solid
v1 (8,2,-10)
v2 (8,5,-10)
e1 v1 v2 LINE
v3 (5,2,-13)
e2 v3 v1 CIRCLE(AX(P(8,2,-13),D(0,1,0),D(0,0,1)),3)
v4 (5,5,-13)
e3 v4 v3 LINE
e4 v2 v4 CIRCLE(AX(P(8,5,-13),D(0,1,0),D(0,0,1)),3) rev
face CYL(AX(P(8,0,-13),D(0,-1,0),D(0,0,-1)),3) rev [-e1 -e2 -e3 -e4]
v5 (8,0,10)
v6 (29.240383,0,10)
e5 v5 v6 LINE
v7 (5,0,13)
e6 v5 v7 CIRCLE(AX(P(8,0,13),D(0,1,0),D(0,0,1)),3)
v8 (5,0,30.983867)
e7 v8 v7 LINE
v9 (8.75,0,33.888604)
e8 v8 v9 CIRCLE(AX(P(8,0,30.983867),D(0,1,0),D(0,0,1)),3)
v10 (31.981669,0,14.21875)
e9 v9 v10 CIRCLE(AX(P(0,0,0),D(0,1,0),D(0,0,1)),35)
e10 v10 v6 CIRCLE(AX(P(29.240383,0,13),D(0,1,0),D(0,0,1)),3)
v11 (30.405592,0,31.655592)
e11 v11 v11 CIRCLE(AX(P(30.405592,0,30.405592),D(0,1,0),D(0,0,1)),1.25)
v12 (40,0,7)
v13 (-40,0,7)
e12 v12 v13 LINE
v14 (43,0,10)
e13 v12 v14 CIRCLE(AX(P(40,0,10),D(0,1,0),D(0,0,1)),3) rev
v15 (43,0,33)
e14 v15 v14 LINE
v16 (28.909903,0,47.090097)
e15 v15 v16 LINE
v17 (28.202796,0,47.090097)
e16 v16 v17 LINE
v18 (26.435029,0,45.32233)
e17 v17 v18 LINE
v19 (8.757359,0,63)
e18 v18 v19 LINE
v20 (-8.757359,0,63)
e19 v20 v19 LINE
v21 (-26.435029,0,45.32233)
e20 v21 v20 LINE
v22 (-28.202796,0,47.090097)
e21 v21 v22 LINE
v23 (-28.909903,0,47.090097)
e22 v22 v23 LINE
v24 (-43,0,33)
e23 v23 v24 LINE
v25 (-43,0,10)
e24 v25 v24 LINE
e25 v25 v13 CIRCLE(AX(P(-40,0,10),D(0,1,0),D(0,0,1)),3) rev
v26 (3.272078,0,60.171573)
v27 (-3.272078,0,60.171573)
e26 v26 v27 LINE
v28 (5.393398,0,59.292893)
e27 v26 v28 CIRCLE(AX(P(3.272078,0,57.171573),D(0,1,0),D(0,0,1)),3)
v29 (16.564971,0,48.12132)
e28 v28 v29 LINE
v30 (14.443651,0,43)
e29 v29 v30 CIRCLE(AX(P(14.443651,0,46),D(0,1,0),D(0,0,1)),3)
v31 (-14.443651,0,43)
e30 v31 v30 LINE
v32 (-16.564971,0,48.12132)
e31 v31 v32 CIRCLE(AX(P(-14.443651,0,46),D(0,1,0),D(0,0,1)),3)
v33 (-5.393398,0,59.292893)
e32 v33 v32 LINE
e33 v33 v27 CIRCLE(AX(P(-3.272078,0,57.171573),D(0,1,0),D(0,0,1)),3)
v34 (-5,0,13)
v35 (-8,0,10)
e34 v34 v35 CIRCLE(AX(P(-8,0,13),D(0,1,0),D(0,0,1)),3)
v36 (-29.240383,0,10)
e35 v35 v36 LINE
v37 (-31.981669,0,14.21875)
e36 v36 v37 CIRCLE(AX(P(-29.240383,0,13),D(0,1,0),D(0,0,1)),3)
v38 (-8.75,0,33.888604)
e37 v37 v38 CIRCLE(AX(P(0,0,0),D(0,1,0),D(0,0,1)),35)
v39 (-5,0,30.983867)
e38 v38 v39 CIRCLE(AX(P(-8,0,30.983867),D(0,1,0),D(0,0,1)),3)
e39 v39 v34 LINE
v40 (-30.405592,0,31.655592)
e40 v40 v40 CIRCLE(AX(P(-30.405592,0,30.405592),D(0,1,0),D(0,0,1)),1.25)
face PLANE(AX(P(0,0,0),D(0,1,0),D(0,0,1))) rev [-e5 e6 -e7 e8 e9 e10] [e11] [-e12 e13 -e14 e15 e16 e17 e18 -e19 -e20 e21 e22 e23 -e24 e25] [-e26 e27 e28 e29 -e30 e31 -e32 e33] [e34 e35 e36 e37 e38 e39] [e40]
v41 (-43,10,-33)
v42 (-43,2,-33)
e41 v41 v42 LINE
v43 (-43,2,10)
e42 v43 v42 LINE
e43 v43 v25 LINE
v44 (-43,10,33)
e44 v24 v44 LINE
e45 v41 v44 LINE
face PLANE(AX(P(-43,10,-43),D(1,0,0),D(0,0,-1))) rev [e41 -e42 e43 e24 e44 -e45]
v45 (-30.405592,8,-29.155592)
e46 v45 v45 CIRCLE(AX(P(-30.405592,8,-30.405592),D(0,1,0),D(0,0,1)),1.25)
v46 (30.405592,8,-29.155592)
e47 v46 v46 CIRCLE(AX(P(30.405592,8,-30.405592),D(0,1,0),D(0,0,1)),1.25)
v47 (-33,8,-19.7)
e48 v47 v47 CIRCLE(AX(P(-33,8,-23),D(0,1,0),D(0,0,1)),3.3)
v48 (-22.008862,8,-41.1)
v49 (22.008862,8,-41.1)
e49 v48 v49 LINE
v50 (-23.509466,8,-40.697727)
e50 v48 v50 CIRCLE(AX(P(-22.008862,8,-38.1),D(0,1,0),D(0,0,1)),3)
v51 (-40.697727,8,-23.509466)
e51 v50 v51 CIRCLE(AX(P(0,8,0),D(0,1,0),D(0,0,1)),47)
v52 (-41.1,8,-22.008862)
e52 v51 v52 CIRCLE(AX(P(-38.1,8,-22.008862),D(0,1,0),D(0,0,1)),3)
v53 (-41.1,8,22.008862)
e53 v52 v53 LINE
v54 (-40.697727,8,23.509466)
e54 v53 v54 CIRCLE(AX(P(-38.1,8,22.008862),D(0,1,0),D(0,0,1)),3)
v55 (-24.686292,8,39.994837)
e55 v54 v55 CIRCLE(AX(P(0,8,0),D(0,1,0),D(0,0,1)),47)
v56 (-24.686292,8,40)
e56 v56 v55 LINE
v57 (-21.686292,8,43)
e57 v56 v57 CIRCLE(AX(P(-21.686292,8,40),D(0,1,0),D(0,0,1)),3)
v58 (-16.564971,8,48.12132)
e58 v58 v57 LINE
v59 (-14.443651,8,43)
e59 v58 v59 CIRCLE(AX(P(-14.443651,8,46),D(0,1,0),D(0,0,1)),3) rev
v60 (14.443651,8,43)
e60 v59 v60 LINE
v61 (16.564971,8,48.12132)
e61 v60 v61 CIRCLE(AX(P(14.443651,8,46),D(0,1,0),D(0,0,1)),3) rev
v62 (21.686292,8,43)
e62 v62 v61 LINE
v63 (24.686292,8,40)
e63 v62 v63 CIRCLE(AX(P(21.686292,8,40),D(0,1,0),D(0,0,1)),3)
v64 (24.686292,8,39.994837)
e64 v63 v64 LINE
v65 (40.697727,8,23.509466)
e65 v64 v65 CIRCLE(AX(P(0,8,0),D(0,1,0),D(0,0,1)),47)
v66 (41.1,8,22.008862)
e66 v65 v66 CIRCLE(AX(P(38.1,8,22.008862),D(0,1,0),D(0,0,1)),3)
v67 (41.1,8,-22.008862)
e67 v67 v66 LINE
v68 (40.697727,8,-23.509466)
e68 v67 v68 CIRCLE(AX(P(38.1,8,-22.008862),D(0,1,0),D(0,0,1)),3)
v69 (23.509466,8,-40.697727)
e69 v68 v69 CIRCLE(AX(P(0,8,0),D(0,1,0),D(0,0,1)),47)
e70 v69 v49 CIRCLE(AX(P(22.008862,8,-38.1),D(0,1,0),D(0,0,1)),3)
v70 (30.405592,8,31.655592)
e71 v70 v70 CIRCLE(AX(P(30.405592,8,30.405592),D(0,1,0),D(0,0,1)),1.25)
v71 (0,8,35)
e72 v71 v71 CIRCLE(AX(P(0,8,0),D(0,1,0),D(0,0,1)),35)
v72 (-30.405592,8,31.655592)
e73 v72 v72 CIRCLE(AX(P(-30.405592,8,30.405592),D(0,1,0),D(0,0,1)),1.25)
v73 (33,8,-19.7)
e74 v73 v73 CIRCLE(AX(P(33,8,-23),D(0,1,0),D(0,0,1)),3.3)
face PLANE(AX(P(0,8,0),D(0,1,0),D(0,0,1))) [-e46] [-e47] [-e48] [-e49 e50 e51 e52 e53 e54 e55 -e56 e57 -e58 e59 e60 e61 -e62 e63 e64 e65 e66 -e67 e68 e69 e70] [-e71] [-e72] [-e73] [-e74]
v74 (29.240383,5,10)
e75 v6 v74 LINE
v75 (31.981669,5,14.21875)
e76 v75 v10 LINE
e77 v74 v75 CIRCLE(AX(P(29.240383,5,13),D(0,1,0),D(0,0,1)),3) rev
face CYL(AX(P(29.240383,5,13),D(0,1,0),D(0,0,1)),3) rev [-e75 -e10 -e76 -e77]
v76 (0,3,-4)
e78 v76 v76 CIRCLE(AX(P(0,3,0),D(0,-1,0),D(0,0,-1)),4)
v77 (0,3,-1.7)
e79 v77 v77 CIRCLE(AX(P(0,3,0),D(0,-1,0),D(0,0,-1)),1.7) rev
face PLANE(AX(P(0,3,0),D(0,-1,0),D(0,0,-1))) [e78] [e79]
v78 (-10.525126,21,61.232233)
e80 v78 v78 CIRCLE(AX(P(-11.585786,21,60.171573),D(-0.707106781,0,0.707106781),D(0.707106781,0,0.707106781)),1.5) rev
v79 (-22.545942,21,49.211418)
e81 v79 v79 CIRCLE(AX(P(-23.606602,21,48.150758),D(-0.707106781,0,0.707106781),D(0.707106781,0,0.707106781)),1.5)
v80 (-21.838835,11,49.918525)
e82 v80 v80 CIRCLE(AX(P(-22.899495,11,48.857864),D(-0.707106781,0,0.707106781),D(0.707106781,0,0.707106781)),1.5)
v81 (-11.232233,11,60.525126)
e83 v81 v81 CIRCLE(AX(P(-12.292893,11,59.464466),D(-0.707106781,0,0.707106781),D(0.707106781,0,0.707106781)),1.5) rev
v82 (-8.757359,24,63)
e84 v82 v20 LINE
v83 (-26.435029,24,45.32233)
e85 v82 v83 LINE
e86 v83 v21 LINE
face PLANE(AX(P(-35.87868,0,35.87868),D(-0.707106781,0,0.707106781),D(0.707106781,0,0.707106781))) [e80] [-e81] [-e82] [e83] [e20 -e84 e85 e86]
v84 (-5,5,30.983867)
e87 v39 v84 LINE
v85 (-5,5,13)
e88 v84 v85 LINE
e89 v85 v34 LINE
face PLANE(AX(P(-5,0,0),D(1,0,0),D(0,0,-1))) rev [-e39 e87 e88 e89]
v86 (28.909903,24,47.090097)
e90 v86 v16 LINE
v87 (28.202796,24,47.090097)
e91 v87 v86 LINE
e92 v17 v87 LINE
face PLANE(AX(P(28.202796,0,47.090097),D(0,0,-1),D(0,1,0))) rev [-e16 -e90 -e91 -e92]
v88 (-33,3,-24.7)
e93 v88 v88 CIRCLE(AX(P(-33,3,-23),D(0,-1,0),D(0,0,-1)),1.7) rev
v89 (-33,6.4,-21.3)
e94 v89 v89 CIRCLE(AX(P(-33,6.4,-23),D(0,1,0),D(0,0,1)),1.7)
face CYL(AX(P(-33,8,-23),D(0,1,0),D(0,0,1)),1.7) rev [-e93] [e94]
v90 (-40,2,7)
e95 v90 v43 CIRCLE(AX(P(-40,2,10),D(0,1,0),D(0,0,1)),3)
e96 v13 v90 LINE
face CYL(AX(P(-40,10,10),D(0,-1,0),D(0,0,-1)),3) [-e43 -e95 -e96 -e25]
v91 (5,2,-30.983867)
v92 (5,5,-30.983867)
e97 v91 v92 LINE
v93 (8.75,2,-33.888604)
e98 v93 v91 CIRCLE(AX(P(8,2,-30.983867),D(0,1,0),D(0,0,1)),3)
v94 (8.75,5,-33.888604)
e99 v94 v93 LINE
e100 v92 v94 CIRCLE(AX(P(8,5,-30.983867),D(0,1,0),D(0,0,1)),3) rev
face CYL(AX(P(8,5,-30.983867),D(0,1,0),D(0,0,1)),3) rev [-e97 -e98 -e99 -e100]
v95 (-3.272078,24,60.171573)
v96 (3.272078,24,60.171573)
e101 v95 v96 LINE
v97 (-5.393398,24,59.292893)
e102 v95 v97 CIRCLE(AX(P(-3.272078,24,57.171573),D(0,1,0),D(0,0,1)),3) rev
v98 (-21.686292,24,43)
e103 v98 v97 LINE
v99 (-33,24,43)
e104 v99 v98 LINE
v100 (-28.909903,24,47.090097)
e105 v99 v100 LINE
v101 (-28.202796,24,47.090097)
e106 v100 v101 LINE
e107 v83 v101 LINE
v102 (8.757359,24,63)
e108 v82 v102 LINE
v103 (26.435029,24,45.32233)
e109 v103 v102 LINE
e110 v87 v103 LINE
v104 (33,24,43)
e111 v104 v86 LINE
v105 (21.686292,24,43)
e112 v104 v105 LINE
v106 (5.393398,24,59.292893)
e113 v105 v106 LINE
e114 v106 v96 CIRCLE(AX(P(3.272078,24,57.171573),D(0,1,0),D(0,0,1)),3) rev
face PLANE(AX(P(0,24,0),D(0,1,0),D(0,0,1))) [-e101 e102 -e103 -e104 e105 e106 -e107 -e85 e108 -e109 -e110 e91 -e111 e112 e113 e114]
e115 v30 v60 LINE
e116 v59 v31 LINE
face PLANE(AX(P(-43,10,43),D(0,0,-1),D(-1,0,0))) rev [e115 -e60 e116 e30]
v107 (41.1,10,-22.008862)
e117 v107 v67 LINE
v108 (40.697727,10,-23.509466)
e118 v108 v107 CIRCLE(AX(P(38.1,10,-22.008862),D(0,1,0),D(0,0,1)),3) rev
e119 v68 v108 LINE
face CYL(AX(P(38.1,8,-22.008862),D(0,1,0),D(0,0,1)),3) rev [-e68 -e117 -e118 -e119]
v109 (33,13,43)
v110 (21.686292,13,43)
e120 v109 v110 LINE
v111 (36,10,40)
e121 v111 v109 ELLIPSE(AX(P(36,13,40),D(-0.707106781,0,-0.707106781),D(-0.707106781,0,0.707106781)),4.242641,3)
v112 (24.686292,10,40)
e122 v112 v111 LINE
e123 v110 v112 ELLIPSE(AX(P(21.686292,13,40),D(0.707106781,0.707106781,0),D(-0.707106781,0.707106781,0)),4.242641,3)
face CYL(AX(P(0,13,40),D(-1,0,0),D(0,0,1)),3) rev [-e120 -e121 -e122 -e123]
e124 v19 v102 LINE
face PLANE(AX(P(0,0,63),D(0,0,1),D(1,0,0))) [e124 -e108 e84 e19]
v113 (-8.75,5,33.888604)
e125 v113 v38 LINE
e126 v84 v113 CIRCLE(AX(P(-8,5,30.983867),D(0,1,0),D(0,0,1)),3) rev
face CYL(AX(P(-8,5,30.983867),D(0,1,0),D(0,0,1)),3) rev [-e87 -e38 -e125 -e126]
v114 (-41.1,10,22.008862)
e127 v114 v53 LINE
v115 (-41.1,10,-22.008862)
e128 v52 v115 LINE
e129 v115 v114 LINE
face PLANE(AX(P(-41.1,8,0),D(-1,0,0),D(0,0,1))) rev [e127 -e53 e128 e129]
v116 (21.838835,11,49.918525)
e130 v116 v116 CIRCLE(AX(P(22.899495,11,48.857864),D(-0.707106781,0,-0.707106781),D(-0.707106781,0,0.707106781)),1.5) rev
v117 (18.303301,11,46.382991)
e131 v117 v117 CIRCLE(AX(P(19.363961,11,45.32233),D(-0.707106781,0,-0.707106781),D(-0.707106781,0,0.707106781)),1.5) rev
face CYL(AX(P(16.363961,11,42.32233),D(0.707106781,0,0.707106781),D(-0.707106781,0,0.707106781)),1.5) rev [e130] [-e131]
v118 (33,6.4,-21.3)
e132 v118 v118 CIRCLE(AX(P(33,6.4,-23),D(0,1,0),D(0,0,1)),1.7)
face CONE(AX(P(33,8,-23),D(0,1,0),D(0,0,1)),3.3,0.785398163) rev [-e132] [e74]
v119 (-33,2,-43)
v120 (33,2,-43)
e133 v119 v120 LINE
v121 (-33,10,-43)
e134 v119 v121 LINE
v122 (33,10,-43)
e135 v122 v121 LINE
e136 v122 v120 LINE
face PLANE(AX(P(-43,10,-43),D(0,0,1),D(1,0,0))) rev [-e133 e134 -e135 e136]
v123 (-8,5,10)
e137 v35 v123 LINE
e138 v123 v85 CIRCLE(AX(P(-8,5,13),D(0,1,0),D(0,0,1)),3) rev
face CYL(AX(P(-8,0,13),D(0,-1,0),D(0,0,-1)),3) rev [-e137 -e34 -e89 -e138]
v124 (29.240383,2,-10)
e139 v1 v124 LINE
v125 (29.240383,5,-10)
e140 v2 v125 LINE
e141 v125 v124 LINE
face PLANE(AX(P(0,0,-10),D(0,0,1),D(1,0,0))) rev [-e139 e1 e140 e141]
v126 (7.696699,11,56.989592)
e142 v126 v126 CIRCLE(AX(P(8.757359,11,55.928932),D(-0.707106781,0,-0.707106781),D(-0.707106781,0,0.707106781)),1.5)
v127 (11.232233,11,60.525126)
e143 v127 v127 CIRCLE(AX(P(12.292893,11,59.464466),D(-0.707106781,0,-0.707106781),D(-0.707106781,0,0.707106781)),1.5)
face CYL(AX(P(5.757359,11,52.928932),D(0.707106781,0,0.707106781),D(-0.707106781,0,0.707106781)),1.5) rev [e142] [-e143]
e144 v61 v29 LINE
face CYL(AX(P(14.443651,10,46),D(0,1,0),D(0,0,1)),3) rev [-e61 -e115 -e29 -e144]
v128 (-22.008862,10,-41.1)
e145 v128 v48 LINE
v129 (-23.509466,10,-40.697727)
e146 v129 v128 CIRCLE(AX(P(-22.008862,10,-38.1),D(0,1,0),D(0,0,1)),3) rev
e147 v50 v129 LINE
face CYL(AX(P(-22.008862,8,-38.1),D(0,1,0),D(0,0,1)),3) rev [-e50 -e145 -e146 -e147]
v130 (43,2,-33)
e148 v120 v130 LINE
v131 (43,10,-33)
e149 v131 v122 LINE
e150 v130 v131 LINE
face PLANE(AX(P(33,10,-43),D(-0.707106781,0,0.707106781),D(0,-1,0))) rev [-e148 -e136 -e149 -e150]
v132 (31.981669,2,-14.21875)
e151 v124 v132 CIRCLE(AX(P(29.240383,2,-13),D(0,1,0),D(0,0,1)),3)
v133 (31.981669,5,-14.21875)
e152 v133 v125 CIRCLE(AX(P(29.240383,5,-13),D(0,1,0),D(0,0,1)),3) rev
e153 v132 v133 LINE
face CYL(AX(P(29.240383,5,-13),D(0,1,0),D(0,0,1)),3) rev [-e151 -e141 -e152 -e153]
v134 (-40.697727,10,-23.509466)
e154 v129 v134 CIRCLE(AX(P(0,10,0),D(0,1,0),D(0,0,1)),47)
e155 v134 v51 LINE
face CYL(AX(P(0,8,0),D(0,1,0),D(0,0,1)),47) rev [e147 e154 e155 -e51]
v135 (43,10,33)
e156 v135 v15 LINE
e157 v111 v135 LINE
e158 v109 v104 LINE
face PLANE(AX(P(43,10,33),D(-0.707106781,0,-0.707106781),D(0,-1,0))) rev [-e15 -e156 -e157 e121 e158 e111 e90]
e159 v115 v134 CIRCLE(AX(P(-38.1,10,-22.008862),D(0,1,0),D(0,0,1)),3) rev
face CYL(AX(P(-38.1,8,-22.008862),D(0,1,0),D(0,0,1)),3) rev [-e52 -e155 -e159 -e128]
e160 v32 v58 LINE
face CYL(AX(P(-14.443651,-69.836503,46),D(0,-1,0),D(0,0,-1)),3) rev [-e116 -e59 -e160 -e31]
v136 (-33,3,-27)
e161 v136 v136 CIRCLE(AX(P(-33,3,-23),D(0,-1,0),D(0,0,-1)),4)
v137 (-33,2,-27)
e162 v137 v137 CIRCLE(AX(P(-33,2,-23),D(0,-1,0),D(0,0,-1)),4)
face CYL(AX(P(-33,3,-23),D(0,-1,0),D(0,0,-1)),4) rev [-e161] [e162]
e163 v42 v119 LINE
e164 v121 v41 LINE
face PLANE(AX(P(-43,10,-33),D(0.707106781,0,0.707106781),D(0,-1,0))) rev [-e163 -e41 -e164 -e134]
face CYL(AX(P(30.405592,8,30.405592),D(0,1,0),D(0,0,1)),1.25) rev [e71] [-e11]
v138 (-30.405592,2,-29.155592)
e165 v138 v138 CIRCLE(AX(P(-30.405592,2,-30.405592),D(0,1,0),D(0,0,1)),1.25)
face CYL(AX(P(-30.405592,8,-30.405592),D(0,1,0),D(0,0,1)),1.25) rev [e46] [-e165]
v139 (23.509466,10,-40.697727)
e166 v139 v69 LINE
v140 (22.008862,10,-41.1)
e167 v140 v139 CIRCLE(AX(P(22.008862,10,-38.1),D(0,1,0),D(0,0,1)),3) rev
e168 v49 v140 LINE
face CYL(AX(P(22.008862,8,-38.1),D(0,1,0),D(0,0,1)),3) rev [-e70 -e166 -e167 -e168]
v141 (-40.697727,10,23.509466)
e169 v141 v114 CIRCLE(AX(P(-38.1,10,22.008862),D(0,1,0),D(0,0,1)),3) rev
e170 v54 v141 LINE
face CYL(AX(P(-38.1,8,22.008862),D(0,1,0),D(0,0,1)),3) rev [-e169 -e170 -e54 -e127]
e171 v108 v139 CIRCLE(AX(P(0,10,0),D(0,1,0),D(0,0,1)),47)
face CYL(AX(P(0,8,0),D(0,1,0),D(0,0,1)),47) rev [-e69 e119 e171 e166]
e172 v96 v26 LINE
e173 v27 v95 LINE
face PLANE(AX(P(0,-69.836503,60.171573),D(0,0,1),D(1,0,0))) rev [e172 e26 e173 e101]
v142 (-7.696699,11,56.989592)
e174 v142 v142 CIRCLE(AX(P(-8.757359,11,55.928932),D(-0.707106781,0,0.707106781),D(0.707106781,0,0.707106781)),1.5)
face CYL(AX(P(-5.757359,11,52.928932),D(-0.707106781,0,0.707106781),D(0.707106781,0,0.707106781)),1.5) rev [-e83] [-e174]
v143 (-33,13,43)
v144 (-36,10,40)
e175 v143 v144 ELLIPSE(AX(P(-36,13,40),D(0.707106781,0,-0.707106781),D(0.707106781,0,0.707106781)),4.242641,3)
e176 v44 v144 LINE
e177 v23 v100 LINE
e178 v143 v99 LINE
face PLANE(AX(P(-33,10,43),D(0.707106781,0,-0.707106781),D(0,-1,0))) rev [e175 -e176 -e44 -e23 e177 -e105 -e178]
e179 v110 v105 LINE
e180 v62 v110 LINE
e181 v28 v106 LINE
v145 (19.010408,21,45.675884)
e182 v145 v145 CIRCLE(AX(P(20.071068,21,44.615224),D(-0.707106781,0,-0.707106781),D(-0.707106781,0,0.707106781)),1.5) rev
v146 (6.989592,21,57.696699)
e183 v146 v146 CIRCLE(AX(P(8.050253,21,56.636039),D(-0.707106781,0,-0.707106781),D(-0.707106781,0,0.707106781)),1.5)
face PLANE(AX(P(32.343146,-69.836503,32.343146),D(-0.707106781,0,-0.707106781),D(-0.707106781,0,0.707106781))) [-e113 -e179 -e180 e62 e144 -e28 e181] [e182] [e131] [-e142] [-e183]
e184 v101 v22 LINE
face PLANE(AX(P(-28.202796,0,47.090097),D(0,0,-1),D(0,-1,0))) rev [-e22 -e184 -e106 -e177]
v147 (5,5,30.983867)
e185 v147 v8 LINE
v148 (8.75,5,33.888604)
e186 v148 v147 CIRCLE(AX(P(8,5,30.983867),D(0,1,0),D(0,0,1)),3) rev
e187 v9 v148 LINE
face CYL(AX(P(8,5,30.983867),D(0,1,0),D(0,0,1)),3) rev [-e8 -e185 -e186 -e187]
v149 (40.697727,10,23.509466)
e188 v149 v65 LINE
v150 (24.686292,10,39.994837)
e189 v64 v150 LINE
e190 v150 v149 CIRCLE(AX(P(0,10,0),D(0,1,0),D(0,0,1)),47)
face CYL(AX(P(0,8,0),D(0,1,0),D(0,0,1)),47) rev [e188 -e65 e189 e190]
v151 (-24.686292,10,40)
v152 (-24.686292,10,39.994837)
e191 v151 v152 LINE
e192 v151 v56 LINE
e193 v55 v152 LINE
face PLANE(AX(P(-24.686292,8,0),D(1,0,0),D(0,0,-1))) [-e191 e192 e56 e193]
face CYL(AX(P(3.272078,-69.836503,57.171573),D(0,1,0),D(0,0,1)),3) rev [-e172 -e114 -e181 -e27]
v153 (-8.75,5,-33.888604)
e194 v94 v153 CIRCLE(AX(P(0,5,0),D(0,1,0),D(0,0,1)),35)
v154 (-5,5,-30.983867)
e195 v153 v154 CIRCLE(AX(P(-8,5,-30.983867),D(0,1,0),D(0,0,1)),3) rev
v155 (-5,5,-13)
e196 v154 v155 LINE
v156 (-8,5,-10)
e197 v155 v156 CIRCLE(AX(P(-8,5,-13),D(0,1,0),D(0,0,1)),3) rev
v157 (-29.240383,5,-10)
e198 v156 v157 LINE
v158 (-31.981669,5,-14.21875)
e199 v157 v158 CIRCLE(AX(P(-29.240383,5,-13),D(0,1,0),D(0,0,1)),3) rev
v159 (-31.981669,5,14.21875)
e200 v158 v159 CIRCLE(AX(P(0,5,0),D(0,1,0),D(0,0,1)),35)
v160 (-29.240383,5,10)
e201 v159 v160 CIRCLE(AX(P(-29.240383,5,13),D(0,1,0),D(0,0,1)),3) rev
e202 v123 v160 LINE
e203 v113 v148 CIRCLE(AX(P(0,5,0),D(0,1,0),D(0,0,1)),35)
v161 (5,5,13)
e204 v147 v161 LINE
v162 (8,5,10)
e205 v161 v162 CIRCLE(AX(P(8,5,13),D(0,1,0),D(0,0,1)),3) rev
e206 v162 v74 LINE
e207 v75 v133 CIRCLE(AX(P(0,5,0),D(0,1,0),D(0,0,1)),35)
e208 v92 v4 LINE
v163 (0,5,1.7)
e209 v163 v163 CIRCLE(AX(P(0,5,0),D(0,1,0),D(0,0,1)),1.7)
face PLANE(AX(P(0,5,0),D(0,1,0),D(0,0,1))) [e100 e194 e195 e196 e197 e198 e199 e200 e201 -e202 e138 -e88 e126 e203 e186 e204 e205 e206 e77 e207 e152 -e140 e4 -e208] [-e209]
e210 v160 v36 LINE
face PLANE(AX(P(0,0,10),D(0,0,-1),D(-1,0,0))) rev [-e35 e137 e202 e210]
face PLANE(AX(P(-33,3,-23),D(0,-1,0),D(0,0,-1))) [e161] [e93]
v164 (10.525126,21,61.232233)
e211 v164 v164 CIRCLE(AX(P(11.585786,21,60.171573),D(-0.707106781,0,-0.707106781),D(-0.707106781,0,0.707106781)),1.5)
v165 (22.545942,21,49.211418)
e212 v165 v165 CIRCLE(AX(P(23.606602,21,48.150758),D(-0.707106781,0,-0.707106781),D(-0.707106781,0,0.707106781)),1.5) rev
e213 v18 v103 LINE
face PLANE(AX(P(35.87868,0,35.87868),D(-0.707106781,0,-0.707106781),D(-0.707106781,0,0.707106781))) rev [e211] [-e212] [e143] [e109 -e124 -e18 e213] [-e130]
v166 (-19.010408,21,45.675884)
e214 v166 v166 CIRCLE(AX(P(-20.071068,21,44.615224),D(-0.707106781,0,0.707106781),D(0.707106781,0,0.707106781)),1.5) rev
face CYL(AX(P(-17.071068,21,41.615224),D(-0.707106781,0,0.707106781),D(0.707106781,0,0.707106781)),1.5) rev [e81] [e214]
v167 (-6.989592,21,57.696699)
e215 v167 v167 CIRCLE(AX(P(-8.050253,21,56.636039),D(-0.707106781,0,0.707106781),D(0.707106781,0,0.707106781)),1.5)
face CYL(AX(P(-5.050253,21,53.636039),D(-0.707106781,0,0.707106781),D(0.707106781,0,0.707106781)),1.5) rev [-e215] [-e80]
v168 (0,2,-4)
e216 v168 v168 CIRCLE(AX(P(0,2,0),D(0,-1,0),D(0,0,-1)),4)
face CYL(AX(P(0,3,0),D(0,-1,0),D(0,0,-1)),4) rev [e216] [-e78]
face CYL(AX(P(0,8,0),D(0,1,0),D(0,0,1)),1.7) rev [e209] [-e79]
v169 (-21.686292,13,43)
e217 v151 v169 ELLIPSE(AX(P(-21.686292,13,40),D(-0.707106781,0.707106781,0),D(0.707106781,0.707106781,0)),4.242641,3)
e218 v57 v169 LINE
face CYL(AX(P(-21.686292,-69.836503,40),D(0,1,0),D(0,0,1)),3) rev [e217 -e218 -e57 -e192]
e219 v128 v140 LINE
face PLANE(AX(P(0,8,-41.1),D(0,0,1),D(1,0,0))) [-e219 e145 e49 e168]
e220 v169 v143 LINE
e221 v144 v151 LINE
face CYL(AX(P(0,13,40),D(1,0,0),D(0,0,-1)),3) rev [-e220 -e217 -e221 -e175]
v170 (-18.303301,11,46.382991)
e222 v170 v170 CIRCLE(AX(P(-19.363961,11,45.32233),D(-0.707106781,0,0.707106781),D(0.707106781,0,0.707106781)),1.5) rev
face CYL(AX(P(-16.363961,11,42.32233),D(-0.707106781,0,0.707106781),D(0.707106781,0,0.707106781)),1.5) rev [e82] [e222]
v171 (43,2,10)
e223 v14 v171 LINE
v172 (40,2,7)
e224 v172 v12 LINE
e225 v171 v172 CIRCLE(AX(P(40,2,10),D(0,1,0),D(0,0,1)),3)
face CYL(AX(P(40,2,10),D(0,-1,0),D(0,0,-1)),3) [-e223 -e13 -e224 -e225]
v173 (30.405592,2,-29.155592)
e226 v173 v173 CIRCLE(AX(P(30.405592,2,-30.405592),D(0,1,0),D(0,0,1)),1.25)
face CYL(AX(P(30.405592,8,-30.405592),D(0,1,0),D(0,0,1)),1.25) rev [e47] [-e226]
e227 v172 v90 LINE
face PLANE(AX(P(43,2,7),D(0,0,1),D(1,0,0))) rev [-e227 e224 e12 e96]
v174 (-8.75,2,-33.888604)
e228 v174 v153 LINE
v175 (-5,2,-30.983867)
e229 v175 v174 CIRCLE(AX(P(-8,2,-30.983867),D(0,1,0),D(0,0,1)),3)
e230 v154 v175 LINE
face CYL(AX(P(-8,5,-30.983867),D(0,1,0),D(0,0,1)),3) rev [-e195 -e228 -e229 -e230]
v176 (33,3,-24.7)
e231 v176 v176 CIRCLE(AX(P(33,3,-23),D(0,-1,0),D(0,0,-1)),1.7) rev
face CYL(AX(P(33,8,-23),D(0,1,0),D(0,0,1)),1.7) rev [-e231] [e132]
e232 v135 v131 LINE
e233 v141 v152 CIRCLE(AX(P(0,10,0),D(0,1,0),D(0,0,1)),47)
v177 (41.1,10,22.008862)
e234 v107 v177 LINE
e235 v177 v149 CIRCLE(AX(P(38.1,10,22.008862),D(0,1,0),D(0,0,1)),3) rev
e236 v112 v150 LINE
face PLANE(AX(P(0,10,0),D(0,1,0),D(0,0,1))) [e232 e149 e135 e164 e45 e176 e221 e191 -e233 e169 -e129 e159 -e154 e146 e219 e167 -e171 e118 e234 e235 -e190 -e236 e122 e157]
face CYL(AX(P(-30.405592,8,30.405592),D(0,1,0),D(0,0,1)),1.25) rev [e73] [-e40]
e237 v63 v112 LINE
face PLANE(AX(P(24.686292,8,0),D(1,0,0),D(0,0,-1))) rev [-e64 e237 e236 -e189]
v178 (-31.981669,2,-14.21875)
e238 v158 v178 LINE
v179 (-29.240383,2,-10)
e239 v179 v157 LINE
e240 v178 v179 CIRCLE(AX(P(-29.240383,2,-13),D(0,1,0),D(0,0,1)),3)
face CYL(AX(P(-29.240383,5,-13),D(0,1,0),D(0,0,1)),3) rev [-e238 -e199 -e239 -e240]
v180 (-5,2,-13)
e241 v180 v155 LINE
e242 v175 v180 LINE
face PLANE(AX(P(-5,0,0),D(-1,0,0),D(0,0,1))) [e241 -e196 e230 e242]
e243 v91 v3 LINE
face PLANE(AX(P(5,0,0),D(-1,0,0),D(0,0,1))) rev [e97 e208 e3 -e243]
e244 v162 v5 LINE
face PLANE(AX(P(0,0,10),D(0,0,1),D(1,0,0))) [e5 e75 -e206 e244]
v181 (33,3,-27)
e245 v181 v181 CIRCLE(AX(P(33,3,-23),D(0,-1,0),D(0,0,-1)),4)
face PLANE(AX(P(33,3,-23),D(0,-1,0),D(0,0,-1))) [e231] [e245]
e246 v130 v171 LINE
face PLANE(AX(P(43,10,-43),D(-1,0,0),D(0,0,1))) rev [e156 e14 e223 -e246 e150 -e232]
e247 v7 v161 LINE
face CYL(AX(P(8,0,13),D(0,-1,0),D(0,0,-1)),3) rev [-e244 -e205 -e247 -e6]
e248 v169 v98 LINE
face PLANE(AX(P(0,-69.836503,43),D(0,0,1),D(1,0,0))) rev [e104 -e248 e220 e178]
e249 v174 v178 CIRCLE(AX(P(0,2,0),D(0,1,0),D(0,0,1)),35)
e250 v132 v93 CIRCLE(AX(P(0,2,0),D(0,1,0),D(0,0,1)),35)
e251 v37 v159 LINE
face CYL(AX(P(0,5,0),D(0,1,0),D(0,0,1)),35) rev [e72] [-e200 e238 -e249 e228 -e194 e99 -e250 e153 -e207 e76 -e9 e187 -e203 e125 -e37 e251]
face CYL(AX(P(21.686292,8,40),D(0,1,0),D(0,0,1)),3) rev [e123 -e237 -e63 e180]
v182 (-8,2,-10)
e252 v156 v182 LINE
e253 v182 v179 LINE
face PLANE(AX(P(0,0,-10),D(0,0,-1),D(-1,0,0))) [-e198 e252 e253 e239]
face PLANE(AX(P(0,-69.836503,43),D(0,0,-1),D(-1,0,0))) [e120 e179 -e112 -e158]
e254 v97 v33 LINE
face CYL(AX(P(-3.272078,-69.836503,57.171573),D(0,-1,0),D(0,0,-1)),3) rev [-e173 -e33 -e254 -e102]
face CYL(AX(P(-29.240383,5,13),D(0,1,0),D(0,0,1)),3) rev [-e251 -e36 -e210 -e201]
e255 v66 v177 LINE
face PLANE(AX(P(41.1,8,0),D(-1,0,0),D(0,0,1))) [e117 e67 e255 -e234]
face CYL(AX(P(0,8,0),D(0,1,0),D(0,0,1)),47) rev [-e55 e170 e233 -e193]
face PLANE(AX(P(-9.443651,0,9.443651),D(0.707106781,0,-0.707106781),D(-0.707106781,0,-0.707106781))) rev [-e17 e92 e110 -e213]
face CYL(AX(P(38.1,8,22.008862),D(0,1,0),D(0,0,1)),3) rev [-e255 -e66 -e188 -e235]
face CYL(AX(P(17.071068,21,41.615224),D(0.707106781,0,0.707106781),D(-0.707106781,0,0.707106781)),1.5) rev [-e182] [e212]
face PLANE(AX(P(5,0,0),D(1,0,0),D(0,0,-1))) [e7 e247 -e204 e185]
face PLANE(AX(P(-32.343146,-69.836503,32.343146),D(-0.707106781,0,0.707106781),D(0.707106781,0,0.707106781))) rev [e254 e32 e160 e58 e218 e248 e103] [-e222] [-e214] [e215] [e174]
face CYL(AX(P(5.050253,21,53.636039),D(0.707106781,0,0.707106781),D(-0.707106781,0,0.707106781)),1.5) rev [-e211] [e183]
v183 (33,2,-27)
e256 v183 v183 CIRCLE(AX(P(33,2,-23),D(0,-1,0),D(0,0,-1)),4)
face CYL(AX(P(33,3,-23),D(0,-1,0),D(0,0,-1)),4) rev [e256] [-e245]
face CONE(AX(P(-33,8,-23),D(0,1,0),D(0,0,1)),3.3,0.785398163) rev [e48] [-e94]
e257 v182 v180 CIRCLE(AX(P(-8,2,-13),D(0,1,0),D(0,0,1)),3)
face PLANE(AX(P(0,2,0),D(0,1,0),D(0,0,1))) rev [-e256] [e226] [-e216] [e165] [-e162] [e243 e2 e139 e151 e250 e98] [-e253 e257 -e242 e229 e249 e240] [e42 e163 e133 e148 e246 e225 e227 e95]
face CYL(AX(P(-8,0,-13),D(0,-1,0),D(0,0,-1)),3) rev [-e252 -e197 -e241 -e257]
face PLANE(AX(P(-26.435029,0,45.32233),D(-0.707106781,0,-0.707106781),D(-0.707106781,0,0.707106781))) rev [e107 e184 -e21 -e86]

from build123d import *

# Parameters (mm, degrees)
EXTRUDE_1_DEPTH             = 10
CUT_EXTRUDE_1_DEPTH         = 2
CUT_EXTRUDE_2_DEPTH         = 2
SKETCH_4_R                  = 35.00000000000001
CUT_EXTRUDE_3_DEPTH         = 3
CUT_EXTRUDE_4_DEPTH         = 62.016391240387215
HOLE_WIZARD_M3_1_D          = 2.5
HOLE_WIZARD_1_D             = 3.4
HOLE_WIZARD_1_CSINK_D       = 6.6
HOLE_WIZARD_1_CSINK_ANGLE   = 90
SKETCH_11_R                 = 4.000000000000005
SKETCH_11_R_2               = 3.999999999999999
SKETCH_11_R_3               = 4
CUT_EXTRUDE_5_DEPTH         = 1
CHAMFER_1_SIZE              = 10
EXTRUDE_2_DEPTH             = 14
EXTRUDE_2_DIRECTION_2_REACH = 63.628
SKETCH_13_R                 = 1.5000000000000009
SKETCH_13_R_2               = 1.5000000000000042
CUT_EXTRUDE_6_DEPTH         = 8
SKETCH_13_3_R               = 1.5000000000000009
SKETCH_13_3_R_2             = 1.5000000000000042
CUT_EXTRUDE_7_DEPTH         = 3
MIRROR_START                = 45.74011537
MIRROR_6_OUTLINE_R          = 1.5
MIRROR_6_DEPTH              = 5
CUT_EXTRUDE_8_DEPTH         = 83.20937791832523
FILLET_1_R                  = 3
FILLET_2_R                  = 3
FILLET_5_R                  = 3
CHAMFER_2_SIZE              = 0.5


# Read off the part's stored shape, not the designer's step: 镜向6
with BuildPart() as part:
    # 草图1 → 凸台-拉伸1 (new body)
    with BuildSketch(Plane(origin=(0, 0, 0), x_dir=(1, 0, 0), z_dir=(0, 1, 0))):
        Polygon((-43, 43), (42.999999999999986, 43), (43, -42.99999999999999), (-43, -42.99999999999999), align=None)
    extrude(amount=EXTRUDE_1_DEPTH)

    # 草图2 → 切除-拉伸1 (cut)
    with BuildSketch(Plane.XZ):
        Polygon((42.99999999999999, 7.000000000000008), (-43, 7.000000000000008), (-43, -43), (43, -43), align=None)
    extrude(amount=-CUT_EXTRUDE_1_DEPTH, mode=Mode.SUBTRACT)

    # 草图3 → 切除-拉伸2 (cut)
    with BuildSketch(Plane(origin=(0, 10, 0), x_dir=(1, 0, 0), z_dir=(0, 1, 0))):
        with BuildLine():
            Line((-24.686291501015234, -42.99999999999999), (24.686291501015248, -42.999999999999986))
            Line((24.686291501015244, -42.999999999999986), (24.686291501015237, -39.994837315919945))
            ThreePointArc((24.686291501015248, -39.99483731591996), (33.99829514057673, -32.45174768073728), (41.099999999999305, -22.79890348240587))
            Line((41.10000000000001, -22.798903482406033), (41.1, 22.798903482403997))
            ThreePointArc((41.10000000000031, 22.798903482404068), (33.23401871576778, 33.234018715767704), (22.79890348240416, 41.10000000000025))
            Line((22.798903482404093, 41.099999999999994), (-22.798903482403766, 41.099999999999994))
            ThreePointArc((-22.798903482403876, 41.1000000000004), (-33.23401871576702, 33.23401871576845), (-41.099999999999426, 22.798903482405624))
            Line((-41.1, 22.798903482405752), (-41.099999999999994, -22.798903482407027))
            ThreePointArc((-41.09999999999881, -22.798903482406732), (-33.99829514057638, -32.45174768073764), (-24.68629150101524, -39.99483731591995))
            Line((-24.686291501015234, -39.994837315919945), (-24.686291501015234, -42.99999999999999))
        make_face()
    extrude(amount=-CUT_EXTRUDE_2_DEPTH, mode=Mode.SUBTRACT)

    # 草图4 → 切除-拉伸3 (cut)
    with BuildSketch(Plane(origin=(0, 8, 0), x_dir=(1, 0, 0), z_dir=(0, 1, 0))):
        with Locations(Location((0, 0, 0), (0, 0, 270))):
            Circle(SKETCH_4_R)
    extrude(amount=-CUT_EXTRUDE_3_DEPTH, mode=Mode.SUBTRACT)

    # 草图5 → 切除-拉伸4 (cut, through all)
    with BuildSketch(Plane(origin=(0, 5, 0), x_dir=(1, 0, 0), z_dir=(0, 1, 0))):
        with BuildLine():
            Line((-4.999999999999996, 9.999999999999993), (-4.999999999999998, 34.64101615137756))
            ThreePointArc((-5, 34.64101615137755), (-22.872417196250915, 26.49249953478618), (-33.54101966249686, 9.999999999999986))
            Line((-33.54101966249684, 9.999999999999977), (-4.999999999999996, 9.999999999999993))
        make_face()
        with BuildLine():
            ThreePointArc((33.54101966249686, 9.999999999999986), (22.87241719625092, 26.492499534786173), (5.0000000000000036, 34.64101615137755))
            Line((5.000000000000002, 34.64101615137756), (5.000000000000006, 9.999999999999993))
            Line((5.000000000000006, 9.999999999999995), (33.54101966249686, 9.999999999999986))
        make_face()
        with BuildLine():
            Line((-4.99999999999999, -9.999999999999996), (-33.54101966249684, -9.999999999999995))
            ThreePointArc((-33.54101966249685, -9.999999999999993), (-22.87241719625092, -26.492499534786173), (-4.999999999999993, -34.64101615137755))
            Line((-4.999999999999981, -34.64101615137756), (-4.99999999999999, -9.999999999999996))
        make_face()
        with BuildLine():
            ThreePointArc((5.000000000000011, -34.64101615137755), (22.87241719625091, -26.49249953478618), (33.54101966249685, -9.999999999999991))
            Line((33.54101966249686, -9.999999999999986), (5.000000000000006, -9.999999999999995))
            Line((5.000000000000006, -9.999999999999993), (5.000000000000002, -34.64101615137756))
        make_face()
    extrude(amount=-CUT_EXTRUDE_4_DEPTH, mode=Mode.SUBTRACT)

    # M3 螺纹孔1 (through all)
    with Locations(Plane(origin=(0, 8, 0), x_dir=(1, 0, 0), z_dir=(0, 1, 0))):
        with Locations((-30.405591591, 30.405591591), (30.405591591, 30.405591591), (30.405591591, -30.405591591), (-30.405591591, -30.405591591)):
            Hole(HOLE_WIZARD_M3_1_D / 2)

    # 打孔尺寸(%根据十字)槽沉头木螺钉的类型1 (through all)
    with Locations(Plane(origin=(0, 8, 0), x_dir=(1, 0, 0), z_dir=(0, 1, 0))):
        with Locations((-33, 23), (33, 23), (0, 0)):
            CounterSinkHole(HOLE_WIZARD_1_D / 2, HOLE_WIZARD_1_CSINK_D / 2, counter_sink_angle=HOLE_WIZARD_1_CSINK_ANGLE)

    # 草图11 → 切除-拉伸5 (cut)
    with BuildSketch(Plane.XZ.offset(-2)):
        with Locations(Location((33, -23.000000000000007, 0), (0, 0, 270))):
            Circle(SKETCH_11_R)
        with Locations(Location((-33, -23, 0), (0, 0, 270))):
            Circle(SKETCH_11_R_2)
        with Locations(Location((0, 0, 0), (0, 0, 270))):
            Circle(SKETCH_11_R_3)
    extrude(amount=-CUT_EXTRUDE_5_DEPTH, mode=Mode.SUBTRACT)

    # 倒角1
    chamfer_1_edges = [part.edges().sort_by_distance(p)[0] for p in [
        (43, 5, 42.99999999999999),
        (-43, 5, 42.99999999999999),
        (-43, 6, -43),
        (42.999999999999986, 6, -43),
    ]]
    chamfer(chamfer_1_edges, length=CHAMFER_1_SIZE)

    # 草图12 → 凸台-拉伸2 (add)
    with BuildSketch(Plane(origin=(0, 10, 0), x_dir=(1, 0, 0), z_dir=(0, 1, 0))):
        Polygon((-21.68629150101517, -42.99999999999999), (-32.999999999999986, -42.99999999999999), (-10.171572875253744, -65.82842712474618), (10.171572875253764, -65.82842712474618), (32.999999999999986, -42.99999999999999), (21.68629150101517, -42.99999999999999), (4.514718625761375, -60.17157287525379), (-4.51471862576136, -60.17157287525379), align=None)
    extrude(amount=EXTRUDE_2_DEPTH)

    # 凸台-拉伸2 direction 2: up to this face of the body (flat: up to its plane)
    extrude_2_direction_2_end = Plane(part.part.faces().sort_by_distance((0, 0, 26.766223415))[0])
    # 草图12 → 凸台-拉伸2 direction 2 (add, up to the picked face)
    with BuildSketch(Plane(origin=(0, 10, 0), x_dir=(1, 0, 0), z_dir=(0, 1, 0)), mode=Mode.PRIVATE) as extrude_2_direction_2_sk1:
        Polygon((-21.68629150101517, -42.99999999999999), (-32.999999999999986, -42.99999999999999), (-10.171572875253744, -65.82842712474618), (10.171572875253764, -65.82842712474618), (32.999999999999986, -42.99999999999999), (21.68629150101517, -42.99999999999999), (4.514718625761375, -60.17157287525379), (-4.51471862576136, -60.17157287525379), align=None)
    extrude_2_direction_2_tool1 = split(extrude(extrude_2_direction_2_sk1.sketch, amount=-EXTRUDE_2_DIRECTION_2_REACH, mode=Mode.PRIVATE), bisect_by=extrude_2_direction_2_end, keep=Keep.BOTH, mode=Mode.PRIVATE)
    add(extrude_2_direction_2_tool1.solids().sort_by(Axis((-13.594324, 10, 52.079605), (0, -1, 0)))[0])

    # 草图13 → 切除-拉伸6 (cut)
    with BuildSketch(Plane(origin=(-38.00000000000007, 0, 37.999999999999886), x_dir=(0.7071067811865458, 0, 0.7071067811865492), z_dir=(-0.7071067811865492, 0, 0.7071067811865458))):
        with Locations((17.35533905932751, 20.999999999999993)):
            Circle(SKETCH_13_R)
        with Locations((34.35533905932751, 20.999999999999996)):
            Circle(SKETCH_13_R_2)
        with Locations((33.35533905932751, 11)):
            Circle(SKETCH_13_R_2)
        with Locations((18.35533905932751, 10.999999999999998)):
            Circle(SKETCH_13_R)
    extrude(amount=-CUT_EXTRUDE_6_DEPTH, mode=Mode.SUBTRACT)

    # 草图13<3> → 切除-拉伸7 (cut)
    with BuildSketch(Plane(origin=(-38.00000000000007, 0, 37.999999999999886), x_dir=(0.7071067811865458, 0, 0.7071067811865492), z_dir=(-0.7071067811865492, 0, 0.7071067811865458))):
        Polygon((38.35533905932751, 24), (13.355339059327509, 23.999999999999996), (13.355339059327513, 0), (38.35533905932752, 3.06e-15), align=None)
        with Locations((18.35533905932751, 10.999999999999998)):
            Circle(SKETCH_13_3_R, mode=Mode.SUBTRACT)
        with Locations((33.35533905932751, 11)):
            Circle(SKETCH_13_3_R_2, mode=Mode.SUBTRACT)
        with Locations((17.35533905932751, 20.999999999999993)):
            Circle(SKETCH_13_3_R, mode=Mode.SUBTRACT)
        with Locations((34.35533905932751, 20.999999999999996)):
            Circle(SKETCH_13_3_R_2, mode=Mode.SUBTRACT)
    extrude(amount=-CUT_EXTRUDE_7_DEPTH, mode=Mode.SUBTRACT)

    # 镜向6 outline → 镜向6 (cut)
    with BuildSketch(Plane(origin=(0, 0, 0), x_dir=(0.707106781186546, 0, -0.707106781186549), z_dir=(0.707106781186549, 0, 0.707106781186546)).offset(MIRROR_START)):
        with Locations((-17.355339059, 21)):
            Circle(MIRROR_6_OUTLINE_R)
        with Locations((-18.355339059, 11)):
            Circle(MIRROR_6_OUTLINE_R)
        with Locations((-33.355339059, 11)):
            Circle(MIRROR_6_OUTLINE_R)
        with Locations((-34.355339059, 21)):
            Circle(MIRROR_6_OUTLINE_R)
    extrude(amount=MIRROR_6_DEPTH, mode=Mode.SUBTRACT)

    # 草图14 → 切除-拉伸8 (cut, through all)
    with BuildSketch(Plane(origin=(0, 24, 0), x_dir=(1, 0, 0), z_dir=(0, 1, 0))):
        Polygon((-2e-17, -65.82842712474616), (-1e-17, -63.00000000000004), (-8.757359312880741, -63.00000000000004), (-10.878679656440386, -65.12132034355969), (-10.171572875253748, -65.82842712474616), align=None)
        Polygon((8.757359312880741, -63.00000000000004), (0, -63.00000000000004), (-2e-17, -65.82842712474616), (10.171572875253762, -65.82842712474618), (10.878679656440323, -65.12132034355963), align=None)
        Polygon((26.435028842544384, -45.32233047033632), (8.757359312880741, -63.00000000000004), (10.878679656440386, -65.12132034355969), (28.556349186104022, -47.44365081389593), align=None)
    extrude(amount=-CUT_EXTRUDE_8_DEPTH, mode=Mode.SUBTRACT)

    # 圆角1
    fillet_1_edges = [part.edges().sort_by_distance(p)[0] for p in [
        (42.99999999999999, 1, 7.000000000000008),
        (-43, 1, 7.000000000000008),
        (33.54101966249685, 2.5, 9.99999999999999),
        (5.000000000000006, 2.5, 9.999999999999993),
        (5.000000000000007, 2.5, 34.641016151377556),
        (-4.999999999999988, 2.5, 34.641016151377556),
        (-4.99999999999999, 2.5, 9.999999999999996),
        (-33.54101966249685, 2.5, 9.999999999999993),
        (33.541019662496865, 3.5, -9.999999999999988),
        (5.000000000000006, 3.5, -9.999999999999993),
        (5.0000000000000036, 3.5, -34.641016151377556),
        (-5, 3.5, -34.641016151377556),
        (-4.999999999999996, 3.5, -9.999999999999993),
        (-33.54101966249685, 3.5, -9.999999999999982),
        (-41.0999999999994, 9, 22.798903482406878),
        (-41.09999999999971, 9, -22.798903482405688),
        (41.10000000000016, 9, -22.798903482404036),
        (41.09999999999966, 9, 22.798903482405954),
        (-22.798903482403823, 9, -41.1000000000002),
        (22.798903482404132, 9, -41.10000000000012),
        (24.686291501015248, 9, 42.999999999999986),
        (-24.686291501015234, 9, 42.99999999999999),
    ]]
    fillet(fillet_1_edges, radius=FILLET_1_R - 0.0001)  # a hair under: the kernel refuses the full size

    # 圆角2
    fillet_2_edges = [part.edges().sort_by_distance(p)[0] for p in [
        (27.34319575050762, 10, 42.99999999999999),
        (-27.34319575050762, 10, 42.99999999999999),
    ]]
    fillet(fillet_2_edges, radius=FILLET_2_R - 0.0001)  # a hair under: the kernel refuses the full size

    # 圆角5
    fillet_5_edges = [part.edges().sort_by_distance(p)[0] for p in [
        (21.68629150101517, 4, 42.99999999999999),
        (-21.68629150101517, 4, 42.99999999999999),
        (-4.514718625761361, 12, 60.17157287525379),
        (4.514718625761375, 12, 60.17157287525379),
    ]]
    fillet(fillet_5_edges, radius=FILLET_5_R)

    # 倒角2
    chamfer_2_edges = [part.edges().sort_by_distance(p)[0] for p in [
        (-28.556349186104043, 11.999999999999998, 47.44365081389596),
        (28.55634918610403, 11.999999999999998, 47.44365081389594),
    ]]
    chamfer(chamfer_2_edges, length=CHAMFER_2_SIZE)


solid = part.part
